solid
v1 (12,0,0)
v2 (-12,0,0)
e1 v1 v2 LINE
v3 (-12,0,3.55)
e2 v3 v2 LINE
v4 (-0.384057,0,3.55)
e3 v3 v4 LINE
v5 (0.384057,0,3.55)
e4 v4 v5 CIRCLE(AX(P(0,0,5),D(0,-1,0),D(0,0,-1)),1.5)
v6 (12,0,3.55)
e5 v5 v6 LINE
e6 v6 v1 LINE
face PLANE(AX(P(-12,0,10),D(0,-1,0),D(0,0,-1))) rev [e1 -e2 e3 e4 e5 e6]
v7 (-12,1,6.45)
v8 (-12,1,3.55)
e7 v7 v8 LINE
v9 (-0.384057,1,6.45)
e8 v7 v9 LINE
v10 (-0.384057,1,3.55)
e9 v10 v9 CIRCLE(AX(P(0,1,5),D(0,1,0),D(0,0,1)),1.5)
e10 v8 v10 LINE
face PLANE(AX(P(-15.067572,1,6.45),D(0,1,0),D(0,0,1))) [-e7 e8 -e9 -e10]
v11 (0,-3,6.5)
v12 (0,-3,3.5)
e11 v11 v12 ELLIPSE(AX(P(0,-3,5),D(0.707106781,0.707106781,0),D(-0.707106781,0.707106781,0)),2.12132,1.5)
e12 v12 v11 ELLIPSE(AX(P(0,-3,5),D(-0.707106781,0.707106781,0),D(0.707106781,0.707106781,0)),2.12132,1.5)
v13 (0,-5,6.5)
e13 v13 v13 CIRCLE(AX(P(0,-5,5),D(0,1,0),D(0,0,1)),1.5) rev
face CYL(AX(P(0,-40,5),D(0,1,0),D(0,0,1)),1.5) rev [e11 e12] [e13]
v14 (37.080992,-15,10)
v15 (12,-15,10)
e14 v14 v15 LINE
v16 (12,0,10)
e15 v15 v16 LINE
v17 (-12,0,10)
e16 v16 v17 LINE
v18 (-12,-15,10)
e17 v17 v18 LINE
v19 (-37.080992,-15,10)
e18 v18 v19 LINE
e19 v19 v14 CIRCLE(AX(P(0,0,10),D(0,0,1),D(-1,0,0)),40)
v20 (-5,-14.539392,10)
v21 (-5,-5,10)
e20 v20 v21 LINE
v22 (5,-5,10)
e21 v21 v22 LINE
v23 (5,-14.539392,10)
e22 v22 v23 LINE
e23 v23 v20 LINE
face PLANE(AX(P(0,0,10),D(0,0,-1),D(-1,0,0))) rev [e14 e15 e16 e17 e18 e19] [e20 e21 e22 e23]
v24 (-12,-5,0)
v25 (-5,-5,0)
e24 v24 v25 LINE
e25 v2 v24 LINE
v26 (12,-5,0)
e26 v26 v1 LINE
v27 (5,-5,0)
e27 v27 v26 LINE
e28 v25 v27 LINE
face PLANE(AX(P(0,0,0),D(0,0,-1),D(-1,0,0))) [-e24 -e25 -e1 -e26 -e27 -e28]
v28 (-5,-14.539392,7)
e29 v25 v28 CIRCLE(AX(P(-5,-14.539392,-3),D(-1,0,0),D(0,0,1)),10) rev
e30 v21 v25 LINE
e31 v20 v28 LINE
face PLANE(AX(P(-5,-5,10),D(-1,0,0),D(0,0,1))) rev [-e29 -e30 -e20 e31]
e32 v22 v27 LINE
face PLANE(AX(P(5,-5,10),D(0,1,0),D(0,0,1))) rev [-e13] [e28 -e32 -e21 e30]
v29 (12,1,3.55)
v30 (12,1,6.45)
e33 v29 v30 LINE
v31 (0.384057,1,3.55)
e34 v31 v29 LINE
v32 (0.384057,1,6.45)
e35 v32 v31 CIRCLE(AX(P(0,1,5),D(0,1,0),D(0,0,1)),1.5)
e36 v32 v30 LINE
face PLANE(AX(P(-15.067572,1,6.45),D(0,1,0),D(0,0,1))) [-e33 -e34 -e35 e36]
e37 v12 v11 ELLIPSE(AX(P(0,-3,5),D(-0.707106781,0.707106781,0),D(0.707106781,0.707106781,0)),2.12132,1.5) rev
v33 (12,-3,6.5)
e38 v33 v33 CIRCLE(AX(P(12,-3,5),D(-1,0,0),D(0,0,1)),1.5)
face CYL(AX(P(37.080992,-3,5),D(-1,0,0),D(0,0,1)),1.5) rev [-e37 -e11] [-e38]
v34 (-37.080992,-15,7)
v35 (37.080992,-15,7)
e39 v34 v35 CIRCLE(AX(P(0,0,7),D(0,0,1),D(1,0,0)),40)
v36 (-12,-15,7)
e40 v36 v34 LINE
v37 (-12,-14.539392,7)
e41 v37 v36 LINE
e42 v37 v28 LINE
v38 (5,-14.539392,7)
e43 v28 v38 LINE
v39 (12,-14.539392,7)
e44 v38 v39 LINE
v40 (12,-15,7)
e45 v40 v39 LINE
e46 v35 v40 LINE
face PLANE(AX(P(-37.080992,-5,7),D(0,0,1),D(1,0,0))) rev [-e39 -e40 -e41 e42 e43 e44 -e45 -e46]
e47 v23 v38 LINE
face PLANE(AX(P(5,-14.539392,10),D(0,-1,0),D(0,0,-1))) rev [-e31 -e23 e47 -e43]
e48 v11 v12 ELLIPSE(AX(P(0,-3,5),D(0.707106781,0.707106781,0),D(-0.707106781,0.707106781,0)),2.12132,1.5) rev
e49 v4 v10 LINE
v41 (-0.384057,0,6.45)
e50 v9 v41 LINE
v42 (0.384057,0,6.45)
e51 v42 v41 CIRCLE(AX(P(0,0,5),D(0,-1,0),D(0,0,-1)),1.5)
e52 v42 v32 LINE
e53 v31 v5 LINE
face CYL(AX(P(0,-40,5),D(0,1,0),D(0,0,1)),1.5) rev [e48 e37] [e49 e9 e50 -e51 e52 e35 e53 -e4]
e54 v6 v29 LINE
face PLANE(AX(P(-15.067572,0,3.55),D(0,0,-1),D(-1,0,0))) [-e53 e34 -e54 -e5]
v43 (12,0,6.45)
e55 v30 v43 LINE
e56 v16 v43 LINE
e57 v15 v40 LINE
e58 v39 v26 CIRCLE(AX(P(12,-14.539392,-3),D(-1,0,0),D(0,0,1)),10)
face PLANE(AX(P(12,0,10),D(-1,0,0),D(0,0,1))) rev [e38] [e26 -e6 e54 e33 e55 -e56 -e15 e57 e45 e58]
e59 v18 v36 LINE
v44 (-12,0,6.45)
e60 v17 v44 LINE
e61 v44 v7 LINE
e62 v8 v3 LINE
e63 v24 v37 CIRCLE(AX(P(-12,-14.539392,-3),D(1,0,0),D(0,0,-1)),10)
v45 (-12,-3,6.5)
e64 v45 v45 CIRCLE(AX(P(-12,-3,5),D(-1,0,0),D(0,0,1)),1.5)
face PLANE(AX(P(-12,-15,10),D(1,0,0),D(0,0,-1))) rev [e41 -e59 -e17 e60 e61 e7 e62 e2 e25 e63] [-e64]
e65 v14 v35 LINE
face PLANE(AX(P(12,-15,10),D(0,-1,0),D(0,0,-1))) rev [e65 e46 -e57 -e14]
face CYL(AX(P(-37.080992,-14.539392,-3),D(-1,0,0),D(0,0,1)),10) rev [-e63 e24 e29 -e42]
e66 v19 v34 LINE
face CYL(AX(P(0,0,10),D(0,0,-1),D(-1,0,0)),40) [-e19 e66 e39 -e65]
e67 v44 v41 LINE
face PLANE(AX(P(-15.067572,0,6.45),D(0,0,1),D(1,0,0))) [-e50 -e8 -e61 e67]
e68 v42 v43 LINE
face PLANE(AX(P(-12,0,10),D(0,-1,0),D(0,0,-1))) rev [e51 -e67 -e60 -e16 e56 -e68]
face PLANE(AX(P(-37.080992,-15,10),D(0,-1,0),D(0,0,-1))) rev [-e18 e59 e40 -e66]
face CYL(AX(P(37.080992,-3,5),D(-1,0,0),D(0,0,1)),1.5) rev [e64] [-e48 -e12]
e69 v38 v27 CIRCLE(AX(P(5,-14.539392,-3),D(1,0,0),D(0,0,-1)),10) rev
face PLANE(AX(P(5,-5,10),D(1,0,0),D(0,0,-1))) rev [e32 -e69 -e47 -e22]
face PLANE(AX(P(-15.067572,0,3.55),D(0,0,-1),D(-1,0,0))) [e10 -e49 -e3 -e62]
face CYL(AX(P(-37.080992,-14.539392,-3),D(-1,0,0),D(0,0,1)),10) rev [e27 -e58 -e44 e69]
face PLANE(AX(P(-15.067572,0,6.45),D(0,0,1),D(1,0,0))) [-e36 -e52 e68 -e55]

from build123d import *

# Parameters (mm, degrees)
BOSS_EXTRUDE1_DEPTH     = 10
SKETCH2_W               = 2.9
SKETCH2_H               = 1
BOSS_EXTRUDE2_DEPTH     = 24
SKETCH3_R               = 1.5
CUT_EXTRUDE1_DEPTH      = 57.178287621
CUT_EXTRUDE2_DEPTH      = 56.452682697
CUT_EXTRUDE2_DEPTH_BACK = 56.452682697
SKETCH5_W               = 7
SKETCH5_H               = 35
FILLET1_START           = 1.5000001
FILLET1_DEPTH           = 10.4999999
FILLET1_START_2         = -12
FILLET1_2_DEPTH         = 10.499986243
FILLET1_START_3         = -1.500013757
FILLET1_3_DEPTH         = 3.000013857
FILLET1_4_OUTLINE_W     = 1.5
FILLET1_4_OUTLINE_H     = 6.418167134
SKETCH6_W               = 10
SKETCH6_H               = 9.539392014
CUT_EXTRUDE3_DEPTH      = 56.452682532
SKETCH7_R               = 1.5
CUT_EXTRUDE4_DEPTH      = 65.101043817


with BuildPart() as part:
    # Sketch1 → Boss-Extrude1 (new body)
    with BuildSketch(Plane.XY):
        with BuildLine():
            Line((-37.080992435, -15), (-12, -15))
            Line((-12, -15), (-12, 0))
            Line((-12, 0), (12, 0))
            Line((12, 0), (12, -15))
            Line((12, -15), (37.080992435, -15))
            ThreePointArc((37.080992435, -15), (0, -40), (-37.080992435, -15))
        make_face()
    extrude(amount=BOSS_EXTRUDE1_DEPTH)

    # Sketch2 → Boss-Extrude2 (add)
    with BuildSketch(Plane(origin=(12, 0, 0), x_dir=(0, 0, -1), z_dir=(1, 0, 0))):
        with Locations((-5, 0.5)):
            Rectangle(SKETCH2_W, SKETCH2_H)
    extrude(amount=-BOSS_EXTRUDE2_DEPTH)

    # Sketch3 → Cut-Extrude1 (cut, through all)
    with BuildSketch(Plane(origin=(0, 1, 0), x_dir=(1, 0, 0), z_dir=(0, 1, 0))):
        with Locations(Location((0, -5, 0), (0, 0, 270))):
            Circle(SKETCH3_R)
    extrude(amount=-CUT_EXTRUDE1_DEPTH, mode=Mode.SUBTRACT)

    # Sketch5 → Cut-Extrude2 (cut, two sides: drawn at the far end of the back side and taken through both)
    with BuildSketch(Plane(origin=(0, 0, 0), x_dir=(0, 0, -1), z_dir=(1, 0, 0)).offset(-CUT_EXTRUDE2_DEPTH_BACK)):
        with Locations((-3.5, -22.5)):
            Rectangle(SKETCH5_W, SKETCH5_H)
    extrude(amount=CUT_EXTRUDE2_DEPTH + CUT_EXTRUDE2_DEPTH_BACK, mode=Mode.SUBTRACT)

    # Fillet1: read off the stored shape, not the designer's step
    # Fillet1 outline → Fillet1 (add)
    with BuildSketch(Plane.YZ.offset(FILLET1_START)):
        with BuildLine():
            Line((-5, 7), (-14.539392014, 7))
            ThreePointArc((-14.539392014, 7), (-8.623312231, 5.062257748), (-5, 0))
            Line((-5, 0), (-5, 7))
        make_face()
    extrude(amount=FILLET1_DEPTH)

    # Fillet1 2 outline → Fillet1 2 (add)
    with BuildSketch(Plane.YZ.offset(FILLET1_START_2)):
        with BuildLine():
            Line((-5, 7), (-14.539392014, 7))
            ThreePointArc((-14.539392014, 7), (-8.623312231, 5.062257748), (-5, 0))
            Line((-5, 0), (-5, 7))
        make_face()
    extrude(amount=FILLET1_2_DEPTH)

    # Fillet1 3 outline → Fillet1 3 (add)
    with BuildSketch(Plane.YZ.offset(FILLET1_START_3)):
        with BuildLine():
            Line((-5, 7), (-14.539392014, 7))
            ThreePointArc((-14.539392014, 7), (-8.623312231, 5.062257748), (-5, 0))
            Line((-5, 0), (-5, 7))
        make_face()
    extrude(amount=FILLET1_3_DEPTH)

    # Fillet1 4 outline → Fillet1 4 (revolve, cut)
    with BuildSketch(Plane.XY.offset(5)):
        with Locations((0.75, -8.209083567)):
            Rectangle(FILLET1_4_OUTLINE_W, FILLET1_4_OUTLINE_H)
    revolve(axis=Axis((0, 0, 5), (0, 1, 0)), mode=Mode.SUBTRACT)

    # Sketch6 → Cut-Extrude3 (cut, through all)
    with BuildSketch(Plane(origin=(0, 0, 0), x_dir=(-1, 0, 0), z_dir=(0, 0, -1))):
        with Locations((0, -9.769696007)):
            Rectangle(SKETCH6_W, SKETCH6_H)
    extrude(amount=-CUT_EXTRUDE3_DEPTH, mode=Mode.SUBTRACT)

    # Sketch7 → Cut-Extrude4 (cut, through all)
    with BuildSketch(Plane.ZY.offset(12)):
        with Locations((5, -3)):
            Circle(SKETCH7_R)
    extrude(amount=-CUT_EXTRUDE4_DEPTH, mode=Mode.SUBTRACT)


solid = part.part
